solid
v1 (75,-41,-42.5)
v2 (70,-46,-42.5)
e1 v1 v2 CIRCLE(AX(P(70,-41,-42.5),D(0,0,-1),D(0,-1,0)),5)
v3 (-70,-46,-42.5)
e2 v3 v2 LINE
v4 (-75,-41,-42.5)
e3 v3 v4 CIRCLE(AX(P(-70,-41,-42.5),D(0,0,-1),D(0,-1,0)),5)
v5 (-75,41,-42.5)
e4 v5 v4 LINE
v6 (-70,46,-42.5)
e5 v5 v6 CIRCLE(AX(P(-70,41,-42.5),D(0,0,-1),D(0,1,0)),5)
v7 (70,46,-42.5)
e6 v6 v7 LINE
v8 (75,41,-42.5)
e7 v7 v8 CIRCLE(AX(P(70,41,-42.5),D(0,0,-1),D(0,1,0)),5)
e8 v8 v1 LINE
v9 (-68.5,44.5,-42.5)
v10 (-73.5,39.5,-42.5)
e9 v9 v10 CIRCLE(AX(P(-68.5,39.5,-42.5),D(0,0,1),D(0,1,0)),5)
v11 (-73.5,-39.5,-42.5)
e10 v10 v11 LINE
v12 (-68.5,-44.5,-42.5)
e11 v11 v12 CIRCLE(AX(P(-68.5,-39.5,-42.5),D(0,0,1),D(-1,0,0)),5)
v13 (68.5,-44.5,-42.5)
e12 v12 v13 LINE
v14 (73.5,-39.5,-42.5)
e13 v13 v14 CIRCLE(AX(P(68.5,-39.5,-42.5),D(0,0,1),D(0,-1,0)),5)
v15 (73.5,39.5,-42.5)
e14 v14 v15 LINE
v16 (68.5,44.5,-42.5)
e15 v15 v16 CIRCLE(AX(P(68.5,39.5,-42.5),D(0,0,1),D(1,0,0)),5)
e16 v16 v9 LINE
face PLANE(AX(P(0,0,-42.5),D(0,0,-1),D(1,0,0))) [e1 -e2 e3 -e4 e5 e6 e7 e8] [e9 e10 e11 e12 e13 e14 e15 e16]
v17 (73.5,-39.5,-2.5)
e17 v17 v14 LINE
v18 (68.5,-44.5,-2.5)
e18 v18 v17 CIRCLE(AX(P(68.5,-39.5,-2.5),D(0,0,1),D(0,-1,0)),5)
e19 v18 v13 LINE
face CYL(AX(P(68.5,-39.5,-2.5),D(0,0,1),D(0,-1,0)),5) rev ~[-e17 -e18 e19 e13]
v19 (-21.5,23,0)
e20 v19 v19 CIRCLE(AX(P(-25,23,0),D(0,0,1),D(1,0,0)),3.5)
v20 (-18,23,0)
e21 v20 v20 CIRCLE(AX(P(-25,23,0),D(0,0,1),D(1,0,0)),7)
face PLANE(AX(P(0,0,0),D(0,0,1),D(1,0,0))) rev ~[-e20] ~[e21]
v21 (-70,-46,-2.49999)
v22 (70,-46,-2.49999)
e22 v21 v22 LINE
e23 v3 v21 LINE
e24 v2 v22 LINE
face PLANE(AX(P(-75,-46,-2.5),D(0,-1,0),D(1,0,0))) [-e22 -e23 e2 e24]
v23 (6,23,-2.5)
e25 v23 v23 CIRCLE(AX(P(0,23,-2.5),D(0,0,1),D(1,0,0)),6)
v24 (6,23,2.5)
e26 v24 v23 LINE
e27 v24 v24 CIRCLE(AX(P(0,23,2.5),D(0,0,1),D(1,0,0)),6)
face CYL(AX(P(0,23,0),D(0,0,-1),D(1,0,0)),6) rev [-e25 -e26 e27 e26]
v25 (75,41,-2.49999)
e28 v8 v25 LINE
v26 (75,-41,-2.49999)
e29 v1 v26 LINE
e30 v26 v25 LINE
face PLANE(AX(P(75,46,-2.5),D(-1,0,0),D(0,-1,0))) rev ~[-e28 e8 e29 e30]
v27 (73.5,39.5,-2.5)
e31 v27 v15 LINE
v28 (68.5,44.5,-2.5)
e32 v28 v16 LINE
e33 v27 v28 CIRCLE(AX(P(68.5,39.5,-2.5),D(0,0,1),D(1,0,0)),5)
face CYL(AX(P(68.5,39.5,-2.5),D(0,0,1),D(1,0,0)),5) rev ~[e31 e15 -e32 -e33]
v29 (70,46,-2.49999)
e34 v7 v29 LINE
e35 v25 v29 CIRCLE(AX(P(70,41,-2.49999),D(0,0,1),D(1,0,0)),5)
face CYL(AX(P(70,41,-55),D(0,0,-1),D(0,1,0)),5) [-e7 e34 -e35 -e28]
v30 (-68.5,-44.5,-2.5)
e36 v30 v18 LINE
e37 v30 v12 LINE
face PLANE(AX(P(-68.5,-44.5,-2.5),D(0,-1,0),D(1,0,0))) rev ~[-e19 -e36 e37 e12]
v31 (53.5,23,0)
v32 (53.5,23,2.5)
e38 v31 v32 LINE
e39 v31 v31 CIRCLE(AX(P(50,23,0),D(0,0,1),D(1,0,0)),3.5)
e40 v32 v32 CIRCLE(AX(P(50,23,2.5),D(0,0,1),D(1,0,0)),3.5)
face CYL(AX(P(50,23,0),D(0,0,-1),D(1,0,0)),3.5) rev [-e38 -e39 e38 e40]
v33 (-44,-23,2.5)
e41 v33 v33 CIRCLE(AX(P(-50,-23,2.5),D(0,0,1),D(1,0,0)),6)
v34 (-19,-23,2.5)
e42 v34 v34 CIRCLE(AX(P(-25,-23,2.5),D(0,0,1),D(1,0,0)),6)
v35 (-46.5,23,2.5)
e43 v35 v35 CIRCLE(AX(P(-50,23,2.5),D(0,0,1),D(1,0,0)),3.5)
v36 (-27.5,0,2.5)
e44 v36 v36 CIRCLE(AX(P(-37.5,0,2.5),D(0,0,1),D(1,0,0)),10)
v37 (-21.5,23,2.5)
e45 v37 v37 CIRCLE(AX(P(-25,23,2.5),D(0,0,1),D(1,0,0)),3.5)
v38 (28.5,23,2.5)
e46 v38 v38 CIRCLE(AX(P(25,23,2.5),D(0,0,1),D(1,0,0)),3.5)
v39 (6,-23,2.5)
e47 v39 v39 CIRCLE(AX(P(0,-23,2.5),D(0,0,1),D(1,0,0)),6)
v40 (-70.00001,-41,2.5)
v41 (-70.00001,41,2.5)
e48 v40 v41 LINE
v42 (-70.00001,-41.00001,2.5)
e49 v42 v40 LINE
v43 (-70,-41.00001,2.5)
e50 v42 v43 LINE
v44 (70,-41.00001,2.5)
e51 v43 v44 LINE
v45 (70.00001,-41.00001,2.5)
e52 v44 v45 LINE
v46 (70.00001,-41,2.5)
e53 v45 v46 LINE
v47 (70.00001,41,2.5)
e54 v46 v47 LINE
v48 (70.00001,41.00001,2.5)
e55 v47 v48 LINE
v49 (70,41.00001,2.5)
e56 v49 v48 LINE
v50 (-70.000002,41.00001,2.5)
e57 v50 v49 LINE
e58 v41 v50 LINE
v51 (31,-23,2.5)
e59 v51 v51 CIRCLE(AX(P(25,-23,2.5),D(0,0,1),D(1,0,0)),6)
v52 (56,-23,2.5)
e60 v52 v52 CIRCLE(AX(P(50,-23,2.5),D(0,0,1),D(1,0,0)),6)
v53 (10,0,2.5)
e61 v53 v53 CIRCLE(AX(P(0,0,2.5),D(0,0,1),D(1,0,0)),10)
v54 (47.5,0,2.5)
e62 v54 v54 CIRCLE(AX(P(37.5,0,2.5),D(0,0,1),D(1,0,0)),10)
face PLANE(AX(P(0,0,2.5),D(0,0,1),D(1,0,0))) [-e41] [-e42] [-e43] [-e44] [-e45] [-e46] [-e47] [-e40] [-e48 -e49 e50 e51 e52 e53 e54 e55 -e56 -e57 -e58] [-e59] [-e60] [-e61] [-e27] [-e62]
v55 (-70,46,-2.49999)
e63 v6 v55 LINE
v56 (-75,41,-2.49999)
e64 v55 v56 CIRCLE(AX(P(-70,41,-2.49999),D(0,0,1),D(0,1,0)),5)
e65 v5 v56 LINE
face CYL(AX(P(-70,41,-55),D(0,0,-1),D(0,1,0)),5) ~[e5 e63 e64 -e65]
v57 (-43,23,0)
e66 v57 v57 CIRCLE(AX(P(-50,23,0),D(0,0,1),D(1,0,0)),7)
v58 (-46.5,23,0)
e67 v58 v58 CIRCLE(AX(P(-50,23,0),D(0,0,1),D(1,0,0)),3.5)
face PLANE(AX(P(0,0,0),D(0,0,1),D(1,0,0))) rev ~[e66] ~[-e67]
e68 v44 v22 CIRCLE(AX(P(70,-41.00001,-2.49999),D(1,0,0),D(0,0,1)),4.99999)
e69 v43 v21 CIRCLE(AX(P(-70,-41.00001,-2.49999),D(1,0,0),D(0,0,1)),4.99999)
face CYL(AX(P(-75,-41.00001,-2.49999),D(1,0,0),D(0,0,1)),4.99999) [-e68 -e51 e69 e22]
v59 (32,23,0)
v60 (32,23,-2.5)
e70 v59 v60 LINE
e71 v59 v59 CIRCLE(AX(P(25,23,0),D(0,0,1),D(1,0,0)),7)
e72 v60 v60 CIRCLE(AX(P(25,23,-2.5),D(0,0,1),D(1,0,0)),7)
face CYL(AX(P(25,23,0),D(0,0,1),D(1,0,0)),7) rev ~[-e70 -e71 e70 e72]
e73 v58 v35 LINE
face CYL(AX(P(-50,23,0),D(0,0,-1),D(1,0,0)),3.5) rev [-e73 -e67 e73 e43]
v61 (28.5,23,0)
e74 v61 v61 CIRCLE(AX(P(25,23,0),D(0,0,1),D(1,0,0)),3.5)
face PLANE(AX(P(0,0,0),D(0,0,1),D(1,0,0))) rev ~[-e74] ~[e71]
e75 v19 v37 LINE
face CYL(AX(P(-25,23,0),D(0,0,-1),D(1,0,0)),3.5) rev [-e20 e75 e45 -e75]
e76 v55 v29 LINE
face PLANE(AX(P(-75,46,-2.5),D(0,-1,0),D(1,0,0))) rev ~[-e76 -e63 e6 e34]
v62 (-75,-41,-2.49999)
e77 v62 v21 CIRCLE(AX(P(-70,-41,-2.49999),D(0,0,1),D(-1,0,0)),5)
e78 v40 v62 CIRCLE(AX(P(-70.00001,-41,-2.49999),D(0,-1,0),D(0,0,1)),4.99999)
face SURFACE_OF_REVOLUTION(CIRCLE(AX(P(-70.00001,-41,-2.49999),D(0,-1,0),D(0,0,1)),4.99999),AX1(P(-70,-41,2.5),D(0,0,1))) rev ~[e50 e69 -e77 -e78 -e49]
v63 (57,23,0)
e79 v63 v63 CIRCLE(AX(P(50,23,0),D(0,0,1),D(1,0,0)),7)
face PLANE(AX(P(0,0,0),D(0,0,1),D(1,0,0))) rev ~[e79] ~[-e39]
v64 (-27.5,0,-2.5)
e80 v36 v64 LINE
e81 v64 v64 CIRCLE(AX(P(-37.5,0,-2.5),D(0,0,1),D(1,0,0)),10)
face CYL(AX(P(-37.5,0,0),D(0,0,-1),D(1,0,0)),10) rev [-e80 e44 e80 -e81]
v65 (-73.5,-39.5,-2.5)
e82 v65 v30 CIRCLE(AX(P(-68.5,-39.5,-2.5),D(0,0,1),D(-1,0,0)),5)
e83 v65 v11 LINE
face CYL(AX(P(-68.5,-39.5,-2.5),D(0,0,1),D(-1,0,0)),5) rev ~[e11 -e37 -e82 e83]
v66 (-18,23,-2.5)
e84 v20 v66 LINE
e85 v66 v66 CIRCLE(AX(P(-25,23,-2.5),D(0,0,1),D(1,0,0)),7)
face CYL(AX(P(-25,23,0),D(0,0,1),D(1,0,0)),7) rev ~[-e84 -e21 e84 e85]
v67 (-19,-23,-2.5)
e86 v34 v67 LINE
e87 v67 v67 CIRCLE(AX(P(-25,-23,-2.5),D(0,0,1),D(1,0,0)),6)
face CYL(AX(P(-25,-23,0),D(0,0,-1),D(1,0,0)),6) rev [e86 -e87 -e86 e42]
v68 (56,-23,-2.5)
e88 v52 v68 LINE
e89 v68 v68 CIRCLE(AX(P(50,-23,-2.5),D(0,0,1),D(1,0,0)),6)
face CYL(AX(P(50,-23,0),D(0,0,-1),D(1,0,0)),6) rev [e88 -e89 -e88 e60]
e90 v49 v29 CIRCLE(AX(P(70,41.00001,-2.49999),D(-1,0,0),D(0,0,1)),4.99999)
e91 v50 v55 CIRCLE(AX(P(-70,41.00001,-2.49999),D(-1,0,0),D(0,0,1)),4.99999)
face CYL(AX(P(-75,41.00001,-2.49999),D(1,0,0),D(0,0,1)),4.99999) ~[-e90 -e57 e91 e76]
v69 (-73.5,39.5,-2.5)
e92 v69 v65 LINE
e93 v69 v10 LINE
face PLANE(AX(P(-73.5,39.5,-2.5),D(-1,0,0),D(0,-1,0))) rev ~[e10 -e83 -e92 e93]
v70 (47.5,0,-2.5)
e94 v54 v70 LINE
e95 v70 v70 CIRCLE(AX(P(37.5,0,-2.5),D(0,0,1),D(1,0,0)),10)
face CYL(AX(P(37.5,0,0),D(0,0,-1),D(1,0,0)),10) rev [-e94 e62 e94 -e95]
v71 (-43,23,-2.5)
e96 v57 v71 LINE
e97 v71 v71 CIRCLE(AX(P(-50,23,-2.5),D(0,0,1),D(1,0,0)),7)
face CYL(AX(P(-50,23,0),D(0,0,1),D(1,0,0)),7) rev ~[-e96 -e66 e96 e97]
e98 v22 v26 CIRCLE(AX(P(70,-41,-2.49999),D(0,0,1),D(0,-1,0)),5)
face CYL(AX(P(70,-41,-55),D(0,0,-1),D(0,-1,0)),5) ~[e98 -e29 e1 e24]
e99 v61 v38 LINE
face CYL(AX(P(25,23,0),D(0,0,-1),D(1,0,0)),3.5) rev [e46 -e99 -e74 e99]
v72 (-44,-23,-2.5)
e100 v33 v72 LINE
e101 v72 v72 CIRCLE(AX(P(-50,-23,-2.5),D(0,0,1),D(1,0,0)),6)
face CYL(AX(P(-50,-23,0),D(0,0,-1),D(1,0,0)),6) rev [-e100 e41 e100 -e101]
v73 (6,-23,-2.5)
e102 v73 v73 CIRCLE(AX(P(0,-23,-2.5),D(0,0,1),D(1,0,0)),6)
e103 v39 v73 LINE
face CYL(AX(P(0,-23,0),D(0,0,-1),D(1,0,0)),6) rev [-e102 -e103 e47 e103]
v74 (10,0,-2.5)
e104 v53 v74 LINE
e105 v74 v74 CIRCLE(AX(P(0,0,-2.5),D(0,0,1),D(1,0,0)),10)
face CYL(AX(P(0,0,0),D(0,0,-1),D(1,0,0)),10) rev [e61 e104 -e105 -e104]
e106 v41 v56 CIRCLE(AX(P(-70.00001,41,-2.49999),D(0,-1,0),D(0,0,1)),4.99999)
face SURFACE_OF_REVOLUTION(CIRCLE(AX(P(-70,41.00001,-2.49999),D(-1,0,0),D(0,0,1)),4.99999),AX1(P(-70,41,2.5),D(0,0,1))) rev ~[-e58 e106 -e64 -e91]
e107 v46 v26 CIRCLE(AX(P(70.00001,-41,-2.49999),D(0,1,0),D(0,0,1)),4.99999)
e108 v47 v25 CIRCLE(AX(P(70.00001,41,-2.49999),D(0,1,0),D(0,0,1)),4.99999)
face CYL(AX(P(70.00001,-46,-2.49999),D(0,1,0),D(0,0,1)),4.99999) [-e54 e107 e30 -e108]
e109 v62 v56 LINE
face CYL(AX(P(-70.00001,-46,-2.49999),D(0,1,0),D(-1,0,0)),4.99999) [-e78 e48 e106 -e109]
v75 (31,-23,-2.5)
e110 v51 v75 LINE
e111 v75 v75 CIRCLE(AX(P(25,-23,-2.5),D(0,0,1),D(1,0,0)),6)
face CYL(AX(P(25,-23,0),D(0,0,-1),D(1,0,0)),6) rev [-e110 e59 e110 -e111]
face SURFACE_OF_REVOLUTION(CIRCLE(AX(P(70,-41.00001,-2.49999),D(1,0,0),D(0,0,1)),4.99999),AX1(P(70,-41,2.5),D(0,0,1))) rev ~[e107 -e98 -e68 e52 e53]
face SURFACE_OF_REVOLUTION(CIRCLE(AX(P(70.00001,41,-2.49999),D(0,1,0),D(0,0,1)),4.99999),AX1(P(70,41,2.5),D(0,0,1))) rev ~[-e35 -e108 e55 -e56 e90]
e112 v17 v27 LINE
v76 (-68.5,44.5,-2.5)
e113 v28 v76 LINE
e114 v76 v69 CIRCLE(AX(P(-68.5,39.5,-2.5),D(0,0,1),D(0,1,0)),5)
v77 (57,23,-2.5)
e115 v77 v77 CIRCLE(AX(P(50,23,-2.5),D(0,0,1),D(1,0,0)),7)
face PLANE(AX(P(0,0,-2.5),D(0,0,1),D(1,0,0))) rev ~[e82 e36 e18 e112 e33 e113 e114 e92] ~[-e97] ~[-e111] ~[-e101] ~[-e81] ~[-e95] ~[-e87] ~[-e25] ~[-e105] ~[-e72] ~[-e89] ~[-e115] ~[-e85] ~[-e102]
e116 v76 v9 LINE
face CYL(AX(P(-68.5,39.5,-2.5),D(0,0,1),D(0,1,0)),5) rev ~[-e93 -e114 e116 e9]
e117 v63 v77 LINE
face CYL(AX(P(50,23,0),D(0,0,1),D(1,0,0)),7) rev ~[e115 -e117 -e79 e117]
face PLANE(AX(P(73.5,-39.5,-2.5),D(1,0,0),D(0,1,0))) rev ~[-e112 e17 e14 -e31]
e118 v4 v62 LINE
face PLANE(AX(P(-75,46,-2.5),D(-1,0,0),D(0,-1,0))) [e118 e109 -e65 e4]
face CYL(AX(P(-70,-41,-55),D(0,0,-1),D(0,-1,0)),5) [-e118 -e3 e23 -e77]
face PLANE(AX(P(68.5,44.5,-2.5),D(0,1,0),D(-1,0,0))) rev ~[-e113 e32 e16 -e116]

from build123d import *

# Parameters (mm, degrees)
F0_W         = 150
F0_H         = 92
F0_R         = 6
F0_R_2       = 10
F0_R_3       = 3.5
F1_DEPTH     = 2.5
F2_W         = 150
F2_H         = 92
F2_R         = 6
F2_R_2       = 10
F2_R_3       = 7
F3_DEPTH     = 2.5
F4_R         = 4.99999
F5_W         = 150
F5_H         = 92
F6_DEPTH     = 40
F7_T1_DEPTH  = 57.5
F7_T4_ANGLE  = 90
F7_T6_ANGLE  = 90
F7_T8_ANGLE  = 90
F7_T10_ANGLE = 90


# Not quite as in the source:
# - a fillet or chamfer that OpenCascade refuses, or shapes differently, is made with other operations: its cross-section is extruded or revolved along the edge and cut away or added
# - a fillet or chamfer is up to 0.001 mm smaller than in the source, because OpenCascade refuses the exact size


with BuildPart() as f1:
    # F0 (on Top) → F1 (new body)
    with BuildSketch(Plane.XY):
        Rectangle(F0_W, F0_H)
        with Locations((-50, -23)):
            Circle(F0_R, mode=Mode.SUBTRACT)
        with Locations((-25, -23)):
            Circle(F0_R, mode=Mode.SUBTRACT)
        with Locations((0, -23)):
            Circle(F0_R, mode=Mode.SUBTRACT)
        with Locations((25, -23)):
            Circle(F0_R, mode=Mode.SUBTRACT)
        with Locations((50, -23)):
            Circle(F0_R, mode=Mode.SUBTRACT)
        with Locations((-37.5, 0)):
            Circle(F0_R_2, mode=Mode.SUBTRACT)
        with Locations((-50, 23)):
            Circle(F0_R_3, mode=Mode.SUBTRACT)
        with Locations((-25, 23)):
            Circle(F0_R_3, mode=Mode.SUBTRACT)
        Circle(F0_R_2, mode=Mode.SUBTRACT)
        with Locations((37.5, 0)):
            Circle(F0_R_2, mode=Mode.SUBTRACT)
        with Locations((0, 23)):
            Circle(F0_R, mode=Mode.SUBTRACT)
        with Locations((25, 23)):
            Circle(F0_R_3, mode=Mode.SUBTRACT)
        with Locations((50, 23)):
            Circle(F0_R_3, mode=Mode.SUBTRACT)
    extrude(amount=F1_DEPTH)

    # F2 (on Top) → F3 (join)
    with BuildSketch(Plane.XY):
        Rectangle(F2_W, F2_H)
        with Locations((-50, -23)):
            Circle(F2_R, mode=Mode.SUBTRACT)
        with Locations((-25, -23)):
            Circle(F2_R, mode=Mode.SUBTRACT)
        with Locations((0, -23)):
            Circle(F2_R, mode=Mode.SUBTRACT)
        with Locations((25, -23)):
            Circle(F2_R, mode=Mode.SUBTRACT)
        with Locations((50, -23)):
            Circle(F2_R, mode=Mode.SUBTRACT)
        with Locations((-37.5, 0)):
            Circle(F2_R_2, mode=Mode.SUBTRACT)
        with Locations((-50, 23)):
            Circle(F2_R_3, mode=Mode.SUBTRACT)
        with Locations((-25, 23)):
            Circle(F2_R_3, mode=Mode.SUBTRACT)
        Circle(F2_R_2, mode=Mode.SUBTRACT)
        with Locations((37.5, 0)):
            Circle(F2_R_2, mode=Mode.SUBTRACT)
        with Locations((0, 23)):
            Circle(F2_R, mode=Mode.SUBTRACT)
        with Locations((25, 23)):
            Circle(F2_R_3, mode=Mode.SUBTRACT)
        with Locations((50, 23)):
            Circle(F2_R_3, mode=Mode.SUBTRACT)
    extrude(amount=-F3_DEPTH)

    # F4 (radius 5 in the source; OpenCascade refuses exactly that, so slightly less here)
    f4_edges = [f1.edges().sort_by_distance(p)[0] for p in [
        (0, 46, 2.5),
        (-75, 0, 2.5),
        (0, -46, 2.5),
        (75, 0, 2.5),
    ]]
    fillet(f4_edges, radius=F4_R)

    # F5 (on face) → F6 (join)
    with BuildSketch(Plane(origin=(0, 0, -2.5), x_dir=(1, 0, 0), z_dir=(0, 0, -1))):
        Rectangle(F5_W, F5_H)
        with BuildLine():
            ThreePointArc((-73.5, 39.5), (-72.0355339059, 43.0355339059), (-68.5, 44.5))
            Line((-68.5, 44.5), (68.5, 44.5))
            ThreePointArc((68.5, 44.5), (72.0355339059, 43.0355339059), (73.5, 39.5))
            Line((73.5, 39.5), (73.5, -39.5))
            ThreePointArc((73.5, -39.5), (72.0355339059, -43.0355339059), (68.5, -44.5))
            Line((68.5, -44.5), (-68.5, -44.5))
            ThreePointArc((-68.5, -44.5), (-72.0355339059, -43.0355339059), (-73.5, -39.5))
            Line((-73.5, -39.5), (-73.5, 39.5))
        make_face(mode=Mode.SUBTRACT)
    extrude(amount=F6_DEPTH)

    # F7: fillet of radius 5 on 4 edges, made by hand

    # F7_s2 → F7_t1 (cut)
    with BuildSketch(Plane.XY.offset(-55)):
        with BuildLine():
            ThreePointArc((70, -46), (73.5355339059, -44.5355339059), (75, -41))
            Line((75, -41), (75, -46))
            Line((75, -46), (70, -46))
        make_face()
        with BuildLine():
            ThreePointArc((70, 46), (73.5355339059, 44.5355339059), (75, 41))
            Line((75, 41), (75, 46))
            Line((75, 46), (70, 46))
        make_face()
        with BuildLine():
            ThreePointArc((-70, 46), (-73.5355339059, 44.5355339059), (-75, 41))
            Line((-75, 41), (-75, 46))
            Line((-75, 46), (-70, 46))
        make_face()
        with BuildLine():
            ThreePointArc((-70, -46), (-73.5355339059, -44.5355339059), (-75, -41))
            Line((-75, -41), (-75, -46))
            Line((-75, -46), (-70, -46))
        make_face()
    extrude(amount=F7_T1_DEPTH, mode=Mode.SUBTRACT)

    # F7_s3 → F7_t4 (revolve, cut)
    with BuildSketch(Plane.XZ.offset(41)):
        with BuildLine():
            ThreePointArc((-70.00001, 2.5), (-73.5355368349, 1.0355368349), (-75, -2.49999))
            Line((-75, -2.49999), (-75, 2.5))
            Line((-75, 2.5), (-70.00001, 2.5))
        make_face()
    revolve(axis=Axis((-70, -41, 2.5), (0, 0, 1)), revolution_arc=F7_T4_ANGLE, mode=Mode.SUBTRACT)

    # F7_s5 → F7_t6 (revolve, cut)
    with BuildSketch(Plane.YZ.offset(-70)):
        with BuildLine():
            ThreePointArc((41.00001, 2.5), (44.5355368349, 1.0355368349), (46, -2.49999))
            Line((46, -2.49999), (46, 2.5))
            Line((46, 2.5), (41.00001, 2.5))
        make_face()
    revolve(axis=Axis((-70, 41, 2.5), (0, 0, 1)), revolution_arc=F7_T6_ANGLE, mode=Mode.SUBTRACT)

    # F7_s7 → F7_t8 (revolve, cut)
    with BuildSketch(Plane.XZ.offset(-41)):
        with BuildLine():
            ThreePointArc((70.00001, 2.5), (73.5355368349, 1.0355368349), (75, -2.49999))
            Line((75, -2.49999), (75, 2.5))
            Line((75, 2.5), (70.00001, 2.5))
        make_face()
    revolve(axis=Axis((70, 41, 2.5), (0, 0, 1)), revolution_arc=F7_T8_ANGLE, mode=Mode.SUBTRACT)

    # F7_s9 → F7_t10 (revolve, cut)
    with BuildSketch(Plane.YZ.offset(70)):
        with BuildLine():
            ThreePointArc((-41.00001, 2.5), (-44.5355368349, 1.0355368349), (-46, -2.49999))
            Line((-46, -2.49999), (-46, 2.5))
            Line((-46, 2.5), (-41.00001, 2.5))
        make_face()
    revolve(axis=Axis((70, -41, 2.5), (0, 0, 1)), revolution_arc=F7_T10_ANGLE, mode=Mode.SUBTRACT)


solid = f1.part
